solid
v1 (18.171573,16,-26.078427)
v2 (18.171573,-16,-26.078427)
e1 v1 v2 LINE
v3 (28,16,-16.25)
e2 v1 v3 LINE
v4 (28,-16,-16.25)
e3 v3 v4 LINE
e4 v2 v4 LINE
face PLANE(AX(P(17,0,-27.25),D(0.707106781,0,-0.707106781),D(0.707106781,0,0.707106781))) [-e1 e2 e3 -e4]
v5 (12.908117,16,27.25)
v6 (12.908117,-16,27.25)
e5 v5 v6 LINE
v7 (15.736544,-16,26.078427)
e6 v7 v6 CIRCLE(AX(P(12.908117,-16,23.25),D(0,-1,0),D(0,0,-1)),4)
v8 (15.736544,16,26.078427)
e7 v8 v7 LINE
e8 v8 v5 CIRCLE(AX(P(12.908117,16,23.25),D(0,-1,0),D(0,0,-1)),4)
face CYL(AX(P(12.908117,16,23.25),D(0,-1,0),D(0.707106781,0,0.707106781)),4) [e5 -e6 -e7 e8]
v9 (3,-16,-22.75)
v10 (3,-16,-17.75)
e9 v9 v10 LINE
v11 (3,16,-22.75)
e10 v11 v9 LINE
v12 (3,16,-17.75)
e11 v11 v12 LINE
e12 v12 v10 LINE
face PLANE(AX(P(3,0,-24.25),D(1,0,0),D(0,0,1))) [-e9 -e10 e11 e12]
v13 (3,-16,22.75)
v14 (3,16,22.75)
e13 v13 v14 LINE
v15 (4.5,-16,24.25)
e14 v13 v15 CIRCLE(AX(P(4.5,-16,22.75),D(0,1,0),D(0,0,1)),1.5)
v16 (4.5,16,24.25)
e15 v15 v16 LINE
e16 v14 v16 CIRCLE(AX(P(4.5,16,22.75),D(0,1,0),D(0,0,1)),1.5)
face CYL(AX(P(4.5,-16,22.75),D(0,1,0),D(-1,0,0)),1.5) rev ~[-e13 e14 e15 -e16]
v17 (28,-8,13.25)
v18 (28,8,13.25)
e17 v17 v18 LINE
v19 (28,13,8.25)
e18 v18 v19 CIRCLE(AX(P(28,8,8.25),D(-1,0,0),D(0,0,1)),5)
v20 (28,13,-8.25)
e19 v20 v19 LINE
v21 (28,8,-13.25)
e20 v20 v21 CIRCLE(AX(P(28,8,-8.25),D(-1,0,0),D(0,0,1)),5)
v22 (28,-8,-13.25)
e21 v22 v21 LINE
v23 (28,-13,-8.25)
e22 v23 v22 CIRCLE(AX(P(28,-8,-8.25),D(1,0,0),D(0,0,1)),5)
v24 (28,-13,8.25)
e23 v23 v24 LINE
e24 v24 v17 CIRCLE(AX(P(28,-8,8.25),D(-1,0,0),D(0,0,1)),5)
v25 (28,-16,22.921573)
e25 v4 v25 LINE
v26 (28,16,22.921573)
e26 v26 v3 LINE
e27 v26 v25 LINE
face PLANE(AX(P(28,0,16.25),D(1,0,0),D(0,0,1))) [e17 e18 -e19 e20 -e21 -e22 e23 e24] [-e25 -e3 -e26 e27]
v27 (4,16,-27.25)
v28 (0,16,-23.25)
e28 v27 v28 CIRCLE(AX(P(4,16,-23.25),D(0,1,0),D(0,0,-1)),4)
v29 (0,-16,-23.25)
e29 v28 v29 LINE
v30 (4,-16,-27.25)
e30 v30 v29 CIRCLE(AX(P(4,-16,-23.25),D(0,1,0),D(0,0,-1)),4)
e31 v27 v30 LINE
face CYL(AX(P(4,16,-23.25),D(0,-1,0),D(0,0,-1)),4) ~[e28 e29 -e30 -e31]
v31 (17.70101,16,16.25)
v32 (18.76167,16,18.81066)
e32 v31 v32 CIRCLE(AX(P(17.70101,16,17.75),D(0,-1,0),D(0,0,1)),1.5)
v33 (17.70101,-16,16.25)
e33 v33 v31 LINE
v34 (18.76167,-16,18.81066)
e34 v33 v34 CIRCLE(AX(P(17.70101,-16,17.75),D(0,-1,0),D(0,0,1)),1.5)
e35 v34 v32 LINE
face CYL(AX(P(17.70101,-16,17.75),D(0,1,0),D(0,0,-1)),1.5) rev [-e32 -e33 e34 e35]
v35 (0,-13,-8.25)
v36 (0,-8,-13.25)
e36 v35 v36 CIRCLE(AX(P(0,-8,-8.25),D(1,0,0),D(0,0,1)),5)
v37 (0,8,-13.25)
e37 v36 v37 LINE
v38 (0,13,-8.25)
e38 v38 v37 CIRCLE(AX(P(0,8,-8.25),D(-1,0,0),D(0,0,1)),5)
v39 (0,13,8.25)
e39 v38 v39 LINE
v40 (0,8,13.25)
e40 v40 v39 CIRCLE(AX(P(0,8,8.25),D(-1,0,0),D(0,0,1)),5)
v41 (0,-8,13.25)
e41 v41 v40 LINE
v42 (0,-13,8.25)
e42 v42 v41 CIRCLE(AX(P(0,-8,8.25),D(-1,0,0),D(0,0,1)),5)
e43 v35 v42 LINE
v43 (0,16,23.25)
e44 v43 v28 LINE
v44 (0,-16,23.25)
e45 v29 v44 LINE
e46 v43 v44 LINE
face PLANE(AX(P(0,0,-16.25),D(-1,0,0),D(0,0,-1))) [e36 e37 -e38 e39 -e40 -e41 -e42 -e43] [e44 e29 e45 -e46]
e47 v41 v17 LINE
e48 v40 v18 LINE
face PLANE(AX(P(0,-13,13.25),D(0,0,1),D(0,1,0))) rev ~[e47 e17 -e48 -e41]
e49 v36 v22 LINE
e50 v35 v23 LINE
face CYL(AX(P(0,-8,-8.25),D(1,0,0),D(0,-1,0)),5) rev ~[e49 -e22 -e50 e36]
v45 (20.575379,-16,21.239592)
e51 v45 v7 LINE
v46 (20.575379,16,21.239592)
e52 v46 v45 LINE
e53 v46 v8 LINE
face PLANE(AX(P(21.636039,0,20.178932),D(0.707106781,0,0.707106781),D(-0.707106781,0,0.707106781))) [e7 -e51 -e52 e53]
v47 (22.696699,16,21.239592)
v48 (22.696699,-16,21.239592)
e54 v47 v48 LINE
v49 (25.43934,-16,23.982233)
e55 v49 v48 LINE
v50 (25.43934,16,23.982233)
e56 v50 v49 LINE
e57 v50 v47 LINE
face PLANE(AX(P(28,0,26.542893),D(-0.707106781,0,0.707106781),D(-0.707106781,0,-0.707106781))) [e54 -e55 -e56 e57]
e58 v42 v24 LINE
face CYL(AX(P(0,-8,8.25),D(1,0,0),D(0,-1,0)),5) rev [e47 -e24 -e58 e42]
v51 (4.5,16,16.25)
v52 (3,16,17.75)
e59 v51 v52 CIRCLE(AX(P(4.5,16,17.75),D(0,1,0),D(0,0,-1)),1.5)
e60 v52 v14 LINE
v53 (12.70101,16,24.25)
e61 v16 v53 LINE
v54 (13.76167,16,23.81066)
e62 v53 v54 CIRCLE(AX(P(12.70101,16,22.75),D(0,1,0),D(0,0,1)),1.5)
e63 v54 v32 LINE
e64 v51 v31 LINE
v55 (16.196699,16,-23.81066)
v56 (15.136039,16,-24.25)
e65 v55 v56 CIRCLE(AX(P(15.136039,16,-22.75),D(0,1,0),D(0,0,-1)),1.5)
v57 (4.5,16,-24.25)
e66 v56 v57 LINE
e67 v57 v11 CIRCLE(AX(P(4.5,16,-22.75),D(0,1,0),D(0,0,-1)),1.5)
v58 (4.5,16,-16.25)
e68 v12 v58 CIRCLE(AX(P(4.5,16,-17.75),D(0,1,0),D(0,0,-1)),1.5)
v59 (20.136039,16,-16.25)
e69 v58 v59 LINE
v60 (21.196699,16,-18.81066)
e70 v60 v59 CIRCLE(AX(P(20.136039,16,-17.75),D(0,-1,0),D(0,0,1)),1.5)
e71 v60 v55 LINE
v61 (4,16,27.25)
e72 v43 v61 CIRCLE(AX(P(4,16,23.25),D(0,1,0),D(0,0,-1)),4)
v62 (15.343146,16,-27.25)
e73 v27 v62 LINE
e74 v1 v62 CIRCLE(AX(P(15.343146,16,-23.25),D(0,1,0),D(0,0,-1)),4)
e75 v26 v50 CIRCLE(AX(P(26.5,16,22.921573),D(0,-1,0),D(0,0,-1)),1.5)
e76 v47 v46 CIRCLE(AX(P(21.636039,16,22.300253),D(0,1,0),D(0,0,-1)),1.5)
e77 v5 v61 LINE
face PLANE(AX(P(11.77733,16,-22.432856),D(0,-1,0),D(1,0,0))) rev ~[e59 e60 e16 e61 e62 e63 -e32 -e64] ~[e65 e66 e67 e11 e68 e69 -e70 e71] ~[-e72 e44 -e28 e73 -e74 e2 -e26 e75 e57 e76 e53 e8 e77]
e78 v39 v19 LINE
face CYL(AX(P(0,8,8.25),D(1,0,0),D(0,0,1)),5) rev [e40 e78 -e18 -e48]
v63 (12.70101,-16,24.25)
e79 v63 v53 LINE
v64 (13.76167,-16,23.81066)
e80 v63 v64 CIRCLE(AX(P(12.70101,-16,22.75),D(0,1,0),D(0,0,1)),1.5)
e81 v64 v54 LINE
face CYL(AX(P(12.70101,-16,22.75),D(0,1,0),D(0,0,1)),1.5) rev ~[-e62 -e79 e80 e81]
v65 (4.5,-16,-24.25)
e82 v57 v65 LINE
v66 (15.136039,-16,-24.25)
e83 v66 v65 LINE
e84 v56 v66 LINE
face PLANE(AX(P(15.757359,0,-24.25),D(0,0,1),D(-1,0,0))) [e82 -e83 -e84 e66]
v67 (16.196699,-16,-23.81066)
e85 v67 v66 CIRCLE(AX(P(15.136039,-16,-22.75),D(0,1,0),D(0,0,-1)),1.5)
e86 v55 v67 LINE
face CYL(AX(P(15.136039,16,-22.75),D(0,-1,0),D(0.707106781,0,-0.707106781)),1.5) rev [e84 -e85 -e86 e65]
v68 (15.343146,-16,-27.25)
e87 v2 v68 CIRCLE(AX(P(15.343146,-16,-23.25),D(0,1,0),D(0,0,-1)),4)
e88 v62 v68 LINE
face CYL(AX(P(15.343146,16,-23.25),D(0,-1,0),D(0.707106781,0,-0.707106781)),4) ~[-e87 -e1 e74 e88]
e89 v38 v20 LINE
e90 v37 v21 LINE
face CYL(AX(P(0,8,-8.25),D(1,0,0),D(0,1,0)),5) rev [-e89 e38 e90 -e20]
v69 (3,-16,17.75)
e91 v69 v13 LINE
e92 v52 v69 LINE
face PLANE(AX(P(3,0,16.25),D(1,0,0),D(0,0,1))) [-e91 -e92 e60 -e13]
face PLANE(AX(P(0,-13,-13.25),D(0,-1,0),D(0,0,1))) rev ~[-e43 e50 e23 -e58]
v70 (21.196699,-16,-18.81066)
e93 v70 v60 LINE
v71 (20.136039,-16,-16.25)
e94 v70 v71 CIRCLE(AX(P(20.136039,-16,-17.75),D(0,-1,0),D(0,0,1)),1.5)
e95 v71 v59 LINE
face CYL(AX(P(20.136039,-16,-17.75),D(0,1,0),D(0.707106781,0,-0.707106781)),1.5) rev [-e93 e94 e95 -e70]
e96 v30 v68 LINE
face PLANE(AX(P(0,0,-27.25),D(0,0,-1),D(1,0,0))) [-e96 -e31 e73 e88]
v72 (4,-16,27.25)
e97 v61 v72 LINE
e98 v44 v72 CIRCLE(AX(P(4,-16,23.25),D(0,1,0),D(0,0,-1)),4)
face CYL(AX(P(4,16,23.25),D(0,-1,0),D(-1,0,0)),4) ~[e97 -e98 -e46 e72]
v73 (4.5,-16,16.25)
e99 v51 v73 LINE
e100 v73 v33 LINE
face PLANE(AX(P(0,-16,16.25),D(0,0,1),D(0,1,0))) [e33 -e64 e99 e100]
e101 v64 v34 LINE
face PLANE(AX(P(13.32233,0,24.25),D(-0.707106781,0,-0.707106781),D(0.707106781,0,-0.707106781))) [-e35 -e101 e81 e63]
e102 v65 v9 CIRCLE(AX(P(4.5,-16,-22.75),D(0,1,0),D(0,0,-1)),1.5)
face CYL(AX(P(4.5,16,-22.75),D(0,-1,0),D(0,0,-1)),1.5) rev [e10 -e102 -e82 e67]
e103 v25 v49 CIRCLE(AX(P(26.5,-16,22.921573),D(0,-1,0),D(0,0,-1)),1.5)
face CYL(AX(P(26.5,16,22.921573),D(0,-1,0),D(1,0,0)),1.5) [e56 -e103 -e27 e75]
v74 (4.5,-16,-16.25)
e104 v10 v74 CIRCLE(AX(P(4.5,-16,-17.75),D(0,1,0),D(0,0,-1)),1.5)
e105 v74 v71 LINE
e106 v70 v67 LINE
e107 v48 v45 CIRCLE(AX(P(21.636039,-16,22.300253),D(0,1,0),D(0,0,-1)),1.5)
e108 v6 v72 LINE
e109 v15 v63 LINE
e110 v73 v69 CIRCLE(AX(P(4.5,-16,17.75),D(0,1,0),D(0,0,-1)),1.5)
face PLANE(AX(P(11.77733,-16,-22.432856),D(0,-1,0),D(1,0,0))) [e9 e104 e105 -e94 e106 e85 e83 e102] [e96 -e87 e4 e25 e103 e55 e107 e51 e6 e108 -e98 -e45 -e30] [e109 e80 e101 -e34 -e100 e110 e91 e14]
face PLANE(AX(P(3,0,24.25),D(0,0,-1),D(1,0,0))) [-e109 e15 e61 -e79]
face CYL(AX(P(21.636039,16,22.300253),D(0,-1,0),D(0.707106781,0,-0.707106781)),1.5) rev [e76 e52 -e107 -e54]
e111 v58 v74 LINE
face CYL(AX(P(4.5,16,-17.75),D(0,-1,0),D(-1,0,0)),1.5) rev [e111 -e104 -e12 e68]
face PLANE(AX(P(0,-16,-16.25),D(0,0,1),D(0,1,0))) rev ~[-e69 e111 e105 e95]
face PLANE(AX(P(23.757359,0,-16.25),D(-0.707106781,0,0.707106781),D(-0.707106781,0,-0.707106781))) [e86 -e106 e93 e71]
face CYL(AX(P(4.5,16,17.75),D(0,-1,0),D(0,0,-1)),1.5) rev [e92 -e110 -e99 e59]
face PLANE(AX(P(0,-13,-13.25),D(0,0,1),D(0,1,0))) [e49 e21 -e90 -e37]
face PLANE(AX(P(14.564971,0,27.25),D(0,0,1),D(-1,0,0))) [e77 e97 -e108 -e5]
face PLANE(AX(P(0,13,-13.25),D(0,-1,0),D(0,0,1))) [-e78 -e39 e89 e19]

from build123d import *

# Parameters (mm, degrees)
F0_W          = 32
F0_H          = 32.5
F0_W_2        = 26
F0_H_2        = 26.5
F1_DEPTH      = 28
F3_DEPTH      = 16
F5_DEPTH      = 16
F5_DEPTH_BACK = 16
F6_R          = 5
F7_R          = 1.5
F8_R          = 4


# Not quite as in the source:
# - a feature names something its author has since deleted; it is built from what else it names


with BuildPart() as f1:
    # F0 (on Right) → F1 (new body)
    with BuildSketch(Plane.YZ):
        Rectangle(F0_W, F0_H)
        Rectangle(F0_W_2, F0_H_2, mode=Mode.SUBTRACT)
    extrude(amount=F1_DEPTH)

    # F2 (on Front) → F3 (join, symmetric)
    with BuildSketch(Plane.XZ):
        Polygon((21.3223304703, 16.25), (28, 16.25), (28, 26.5428932188), (21.6360389693, 20.1789321881), (14.5649711575, 27.25), (0, 27.25), (0, 16.25), (3, 16.25), (3, 24.25), (13.3223304703, 24.25), align=None)
    extrude(amount=F3_DEPTH, both=True)

    # F4 (on Front) → F5 (join, two sides)
    with BuildSketch(Plane.XZ) as f5_sk:
        Polygon((3, -16.25), (0, -16.25), (0, -27.25), (17, -27.25), (28, -16.25), (23.7573593129, -16.25), (15.7573593129, -24.25), (3, -24.25), align=None)
    extrude(amount=F5_DEPTH)
    extrude(f5_sk.sketch, amount=-F5_DEPTH_BACK)

    # F6
    f6_edges = [f1.edges().sort_by_distance(p)[0] for p in [
        (14, 13, -13.25),
        (14, 13, 13.25),
        (14, -13, 13.25),
        (14, -13, -13.25),
    ]]
    fillet(f6_edges, radius=F6_R)

    # F7
    f7_edges = [f1.edges().sort_by_distance(p)[0] for p in [
        (3, 0, 16.25),
        (3, 0, 24.25),
        (13.32233, 0, 24.25),
        (21.32233, 0, 16.25),
        (21.636039, 0, 20.178932),
        (28, 0, 26.542893),
        (3, 0, -16.25),
        (23.757359, 0, -16.25),
        (15.757359, 0, -24.25),
        (3, 0, -24.25),
    ]]
    fillet(f7_edges, radius=F7_R)

    # F8
    f8_edges = [f1.edges().sort_by_distance(p)[0] for p in [
        (0, 0, 27.25),
        (14.564971, 0, 27.25),
        (0, 0, -27.25),
        (17, 0, -27.25),
    ]]
    fillet(f8_edges, radius=F8_R)


solid = f1.part
